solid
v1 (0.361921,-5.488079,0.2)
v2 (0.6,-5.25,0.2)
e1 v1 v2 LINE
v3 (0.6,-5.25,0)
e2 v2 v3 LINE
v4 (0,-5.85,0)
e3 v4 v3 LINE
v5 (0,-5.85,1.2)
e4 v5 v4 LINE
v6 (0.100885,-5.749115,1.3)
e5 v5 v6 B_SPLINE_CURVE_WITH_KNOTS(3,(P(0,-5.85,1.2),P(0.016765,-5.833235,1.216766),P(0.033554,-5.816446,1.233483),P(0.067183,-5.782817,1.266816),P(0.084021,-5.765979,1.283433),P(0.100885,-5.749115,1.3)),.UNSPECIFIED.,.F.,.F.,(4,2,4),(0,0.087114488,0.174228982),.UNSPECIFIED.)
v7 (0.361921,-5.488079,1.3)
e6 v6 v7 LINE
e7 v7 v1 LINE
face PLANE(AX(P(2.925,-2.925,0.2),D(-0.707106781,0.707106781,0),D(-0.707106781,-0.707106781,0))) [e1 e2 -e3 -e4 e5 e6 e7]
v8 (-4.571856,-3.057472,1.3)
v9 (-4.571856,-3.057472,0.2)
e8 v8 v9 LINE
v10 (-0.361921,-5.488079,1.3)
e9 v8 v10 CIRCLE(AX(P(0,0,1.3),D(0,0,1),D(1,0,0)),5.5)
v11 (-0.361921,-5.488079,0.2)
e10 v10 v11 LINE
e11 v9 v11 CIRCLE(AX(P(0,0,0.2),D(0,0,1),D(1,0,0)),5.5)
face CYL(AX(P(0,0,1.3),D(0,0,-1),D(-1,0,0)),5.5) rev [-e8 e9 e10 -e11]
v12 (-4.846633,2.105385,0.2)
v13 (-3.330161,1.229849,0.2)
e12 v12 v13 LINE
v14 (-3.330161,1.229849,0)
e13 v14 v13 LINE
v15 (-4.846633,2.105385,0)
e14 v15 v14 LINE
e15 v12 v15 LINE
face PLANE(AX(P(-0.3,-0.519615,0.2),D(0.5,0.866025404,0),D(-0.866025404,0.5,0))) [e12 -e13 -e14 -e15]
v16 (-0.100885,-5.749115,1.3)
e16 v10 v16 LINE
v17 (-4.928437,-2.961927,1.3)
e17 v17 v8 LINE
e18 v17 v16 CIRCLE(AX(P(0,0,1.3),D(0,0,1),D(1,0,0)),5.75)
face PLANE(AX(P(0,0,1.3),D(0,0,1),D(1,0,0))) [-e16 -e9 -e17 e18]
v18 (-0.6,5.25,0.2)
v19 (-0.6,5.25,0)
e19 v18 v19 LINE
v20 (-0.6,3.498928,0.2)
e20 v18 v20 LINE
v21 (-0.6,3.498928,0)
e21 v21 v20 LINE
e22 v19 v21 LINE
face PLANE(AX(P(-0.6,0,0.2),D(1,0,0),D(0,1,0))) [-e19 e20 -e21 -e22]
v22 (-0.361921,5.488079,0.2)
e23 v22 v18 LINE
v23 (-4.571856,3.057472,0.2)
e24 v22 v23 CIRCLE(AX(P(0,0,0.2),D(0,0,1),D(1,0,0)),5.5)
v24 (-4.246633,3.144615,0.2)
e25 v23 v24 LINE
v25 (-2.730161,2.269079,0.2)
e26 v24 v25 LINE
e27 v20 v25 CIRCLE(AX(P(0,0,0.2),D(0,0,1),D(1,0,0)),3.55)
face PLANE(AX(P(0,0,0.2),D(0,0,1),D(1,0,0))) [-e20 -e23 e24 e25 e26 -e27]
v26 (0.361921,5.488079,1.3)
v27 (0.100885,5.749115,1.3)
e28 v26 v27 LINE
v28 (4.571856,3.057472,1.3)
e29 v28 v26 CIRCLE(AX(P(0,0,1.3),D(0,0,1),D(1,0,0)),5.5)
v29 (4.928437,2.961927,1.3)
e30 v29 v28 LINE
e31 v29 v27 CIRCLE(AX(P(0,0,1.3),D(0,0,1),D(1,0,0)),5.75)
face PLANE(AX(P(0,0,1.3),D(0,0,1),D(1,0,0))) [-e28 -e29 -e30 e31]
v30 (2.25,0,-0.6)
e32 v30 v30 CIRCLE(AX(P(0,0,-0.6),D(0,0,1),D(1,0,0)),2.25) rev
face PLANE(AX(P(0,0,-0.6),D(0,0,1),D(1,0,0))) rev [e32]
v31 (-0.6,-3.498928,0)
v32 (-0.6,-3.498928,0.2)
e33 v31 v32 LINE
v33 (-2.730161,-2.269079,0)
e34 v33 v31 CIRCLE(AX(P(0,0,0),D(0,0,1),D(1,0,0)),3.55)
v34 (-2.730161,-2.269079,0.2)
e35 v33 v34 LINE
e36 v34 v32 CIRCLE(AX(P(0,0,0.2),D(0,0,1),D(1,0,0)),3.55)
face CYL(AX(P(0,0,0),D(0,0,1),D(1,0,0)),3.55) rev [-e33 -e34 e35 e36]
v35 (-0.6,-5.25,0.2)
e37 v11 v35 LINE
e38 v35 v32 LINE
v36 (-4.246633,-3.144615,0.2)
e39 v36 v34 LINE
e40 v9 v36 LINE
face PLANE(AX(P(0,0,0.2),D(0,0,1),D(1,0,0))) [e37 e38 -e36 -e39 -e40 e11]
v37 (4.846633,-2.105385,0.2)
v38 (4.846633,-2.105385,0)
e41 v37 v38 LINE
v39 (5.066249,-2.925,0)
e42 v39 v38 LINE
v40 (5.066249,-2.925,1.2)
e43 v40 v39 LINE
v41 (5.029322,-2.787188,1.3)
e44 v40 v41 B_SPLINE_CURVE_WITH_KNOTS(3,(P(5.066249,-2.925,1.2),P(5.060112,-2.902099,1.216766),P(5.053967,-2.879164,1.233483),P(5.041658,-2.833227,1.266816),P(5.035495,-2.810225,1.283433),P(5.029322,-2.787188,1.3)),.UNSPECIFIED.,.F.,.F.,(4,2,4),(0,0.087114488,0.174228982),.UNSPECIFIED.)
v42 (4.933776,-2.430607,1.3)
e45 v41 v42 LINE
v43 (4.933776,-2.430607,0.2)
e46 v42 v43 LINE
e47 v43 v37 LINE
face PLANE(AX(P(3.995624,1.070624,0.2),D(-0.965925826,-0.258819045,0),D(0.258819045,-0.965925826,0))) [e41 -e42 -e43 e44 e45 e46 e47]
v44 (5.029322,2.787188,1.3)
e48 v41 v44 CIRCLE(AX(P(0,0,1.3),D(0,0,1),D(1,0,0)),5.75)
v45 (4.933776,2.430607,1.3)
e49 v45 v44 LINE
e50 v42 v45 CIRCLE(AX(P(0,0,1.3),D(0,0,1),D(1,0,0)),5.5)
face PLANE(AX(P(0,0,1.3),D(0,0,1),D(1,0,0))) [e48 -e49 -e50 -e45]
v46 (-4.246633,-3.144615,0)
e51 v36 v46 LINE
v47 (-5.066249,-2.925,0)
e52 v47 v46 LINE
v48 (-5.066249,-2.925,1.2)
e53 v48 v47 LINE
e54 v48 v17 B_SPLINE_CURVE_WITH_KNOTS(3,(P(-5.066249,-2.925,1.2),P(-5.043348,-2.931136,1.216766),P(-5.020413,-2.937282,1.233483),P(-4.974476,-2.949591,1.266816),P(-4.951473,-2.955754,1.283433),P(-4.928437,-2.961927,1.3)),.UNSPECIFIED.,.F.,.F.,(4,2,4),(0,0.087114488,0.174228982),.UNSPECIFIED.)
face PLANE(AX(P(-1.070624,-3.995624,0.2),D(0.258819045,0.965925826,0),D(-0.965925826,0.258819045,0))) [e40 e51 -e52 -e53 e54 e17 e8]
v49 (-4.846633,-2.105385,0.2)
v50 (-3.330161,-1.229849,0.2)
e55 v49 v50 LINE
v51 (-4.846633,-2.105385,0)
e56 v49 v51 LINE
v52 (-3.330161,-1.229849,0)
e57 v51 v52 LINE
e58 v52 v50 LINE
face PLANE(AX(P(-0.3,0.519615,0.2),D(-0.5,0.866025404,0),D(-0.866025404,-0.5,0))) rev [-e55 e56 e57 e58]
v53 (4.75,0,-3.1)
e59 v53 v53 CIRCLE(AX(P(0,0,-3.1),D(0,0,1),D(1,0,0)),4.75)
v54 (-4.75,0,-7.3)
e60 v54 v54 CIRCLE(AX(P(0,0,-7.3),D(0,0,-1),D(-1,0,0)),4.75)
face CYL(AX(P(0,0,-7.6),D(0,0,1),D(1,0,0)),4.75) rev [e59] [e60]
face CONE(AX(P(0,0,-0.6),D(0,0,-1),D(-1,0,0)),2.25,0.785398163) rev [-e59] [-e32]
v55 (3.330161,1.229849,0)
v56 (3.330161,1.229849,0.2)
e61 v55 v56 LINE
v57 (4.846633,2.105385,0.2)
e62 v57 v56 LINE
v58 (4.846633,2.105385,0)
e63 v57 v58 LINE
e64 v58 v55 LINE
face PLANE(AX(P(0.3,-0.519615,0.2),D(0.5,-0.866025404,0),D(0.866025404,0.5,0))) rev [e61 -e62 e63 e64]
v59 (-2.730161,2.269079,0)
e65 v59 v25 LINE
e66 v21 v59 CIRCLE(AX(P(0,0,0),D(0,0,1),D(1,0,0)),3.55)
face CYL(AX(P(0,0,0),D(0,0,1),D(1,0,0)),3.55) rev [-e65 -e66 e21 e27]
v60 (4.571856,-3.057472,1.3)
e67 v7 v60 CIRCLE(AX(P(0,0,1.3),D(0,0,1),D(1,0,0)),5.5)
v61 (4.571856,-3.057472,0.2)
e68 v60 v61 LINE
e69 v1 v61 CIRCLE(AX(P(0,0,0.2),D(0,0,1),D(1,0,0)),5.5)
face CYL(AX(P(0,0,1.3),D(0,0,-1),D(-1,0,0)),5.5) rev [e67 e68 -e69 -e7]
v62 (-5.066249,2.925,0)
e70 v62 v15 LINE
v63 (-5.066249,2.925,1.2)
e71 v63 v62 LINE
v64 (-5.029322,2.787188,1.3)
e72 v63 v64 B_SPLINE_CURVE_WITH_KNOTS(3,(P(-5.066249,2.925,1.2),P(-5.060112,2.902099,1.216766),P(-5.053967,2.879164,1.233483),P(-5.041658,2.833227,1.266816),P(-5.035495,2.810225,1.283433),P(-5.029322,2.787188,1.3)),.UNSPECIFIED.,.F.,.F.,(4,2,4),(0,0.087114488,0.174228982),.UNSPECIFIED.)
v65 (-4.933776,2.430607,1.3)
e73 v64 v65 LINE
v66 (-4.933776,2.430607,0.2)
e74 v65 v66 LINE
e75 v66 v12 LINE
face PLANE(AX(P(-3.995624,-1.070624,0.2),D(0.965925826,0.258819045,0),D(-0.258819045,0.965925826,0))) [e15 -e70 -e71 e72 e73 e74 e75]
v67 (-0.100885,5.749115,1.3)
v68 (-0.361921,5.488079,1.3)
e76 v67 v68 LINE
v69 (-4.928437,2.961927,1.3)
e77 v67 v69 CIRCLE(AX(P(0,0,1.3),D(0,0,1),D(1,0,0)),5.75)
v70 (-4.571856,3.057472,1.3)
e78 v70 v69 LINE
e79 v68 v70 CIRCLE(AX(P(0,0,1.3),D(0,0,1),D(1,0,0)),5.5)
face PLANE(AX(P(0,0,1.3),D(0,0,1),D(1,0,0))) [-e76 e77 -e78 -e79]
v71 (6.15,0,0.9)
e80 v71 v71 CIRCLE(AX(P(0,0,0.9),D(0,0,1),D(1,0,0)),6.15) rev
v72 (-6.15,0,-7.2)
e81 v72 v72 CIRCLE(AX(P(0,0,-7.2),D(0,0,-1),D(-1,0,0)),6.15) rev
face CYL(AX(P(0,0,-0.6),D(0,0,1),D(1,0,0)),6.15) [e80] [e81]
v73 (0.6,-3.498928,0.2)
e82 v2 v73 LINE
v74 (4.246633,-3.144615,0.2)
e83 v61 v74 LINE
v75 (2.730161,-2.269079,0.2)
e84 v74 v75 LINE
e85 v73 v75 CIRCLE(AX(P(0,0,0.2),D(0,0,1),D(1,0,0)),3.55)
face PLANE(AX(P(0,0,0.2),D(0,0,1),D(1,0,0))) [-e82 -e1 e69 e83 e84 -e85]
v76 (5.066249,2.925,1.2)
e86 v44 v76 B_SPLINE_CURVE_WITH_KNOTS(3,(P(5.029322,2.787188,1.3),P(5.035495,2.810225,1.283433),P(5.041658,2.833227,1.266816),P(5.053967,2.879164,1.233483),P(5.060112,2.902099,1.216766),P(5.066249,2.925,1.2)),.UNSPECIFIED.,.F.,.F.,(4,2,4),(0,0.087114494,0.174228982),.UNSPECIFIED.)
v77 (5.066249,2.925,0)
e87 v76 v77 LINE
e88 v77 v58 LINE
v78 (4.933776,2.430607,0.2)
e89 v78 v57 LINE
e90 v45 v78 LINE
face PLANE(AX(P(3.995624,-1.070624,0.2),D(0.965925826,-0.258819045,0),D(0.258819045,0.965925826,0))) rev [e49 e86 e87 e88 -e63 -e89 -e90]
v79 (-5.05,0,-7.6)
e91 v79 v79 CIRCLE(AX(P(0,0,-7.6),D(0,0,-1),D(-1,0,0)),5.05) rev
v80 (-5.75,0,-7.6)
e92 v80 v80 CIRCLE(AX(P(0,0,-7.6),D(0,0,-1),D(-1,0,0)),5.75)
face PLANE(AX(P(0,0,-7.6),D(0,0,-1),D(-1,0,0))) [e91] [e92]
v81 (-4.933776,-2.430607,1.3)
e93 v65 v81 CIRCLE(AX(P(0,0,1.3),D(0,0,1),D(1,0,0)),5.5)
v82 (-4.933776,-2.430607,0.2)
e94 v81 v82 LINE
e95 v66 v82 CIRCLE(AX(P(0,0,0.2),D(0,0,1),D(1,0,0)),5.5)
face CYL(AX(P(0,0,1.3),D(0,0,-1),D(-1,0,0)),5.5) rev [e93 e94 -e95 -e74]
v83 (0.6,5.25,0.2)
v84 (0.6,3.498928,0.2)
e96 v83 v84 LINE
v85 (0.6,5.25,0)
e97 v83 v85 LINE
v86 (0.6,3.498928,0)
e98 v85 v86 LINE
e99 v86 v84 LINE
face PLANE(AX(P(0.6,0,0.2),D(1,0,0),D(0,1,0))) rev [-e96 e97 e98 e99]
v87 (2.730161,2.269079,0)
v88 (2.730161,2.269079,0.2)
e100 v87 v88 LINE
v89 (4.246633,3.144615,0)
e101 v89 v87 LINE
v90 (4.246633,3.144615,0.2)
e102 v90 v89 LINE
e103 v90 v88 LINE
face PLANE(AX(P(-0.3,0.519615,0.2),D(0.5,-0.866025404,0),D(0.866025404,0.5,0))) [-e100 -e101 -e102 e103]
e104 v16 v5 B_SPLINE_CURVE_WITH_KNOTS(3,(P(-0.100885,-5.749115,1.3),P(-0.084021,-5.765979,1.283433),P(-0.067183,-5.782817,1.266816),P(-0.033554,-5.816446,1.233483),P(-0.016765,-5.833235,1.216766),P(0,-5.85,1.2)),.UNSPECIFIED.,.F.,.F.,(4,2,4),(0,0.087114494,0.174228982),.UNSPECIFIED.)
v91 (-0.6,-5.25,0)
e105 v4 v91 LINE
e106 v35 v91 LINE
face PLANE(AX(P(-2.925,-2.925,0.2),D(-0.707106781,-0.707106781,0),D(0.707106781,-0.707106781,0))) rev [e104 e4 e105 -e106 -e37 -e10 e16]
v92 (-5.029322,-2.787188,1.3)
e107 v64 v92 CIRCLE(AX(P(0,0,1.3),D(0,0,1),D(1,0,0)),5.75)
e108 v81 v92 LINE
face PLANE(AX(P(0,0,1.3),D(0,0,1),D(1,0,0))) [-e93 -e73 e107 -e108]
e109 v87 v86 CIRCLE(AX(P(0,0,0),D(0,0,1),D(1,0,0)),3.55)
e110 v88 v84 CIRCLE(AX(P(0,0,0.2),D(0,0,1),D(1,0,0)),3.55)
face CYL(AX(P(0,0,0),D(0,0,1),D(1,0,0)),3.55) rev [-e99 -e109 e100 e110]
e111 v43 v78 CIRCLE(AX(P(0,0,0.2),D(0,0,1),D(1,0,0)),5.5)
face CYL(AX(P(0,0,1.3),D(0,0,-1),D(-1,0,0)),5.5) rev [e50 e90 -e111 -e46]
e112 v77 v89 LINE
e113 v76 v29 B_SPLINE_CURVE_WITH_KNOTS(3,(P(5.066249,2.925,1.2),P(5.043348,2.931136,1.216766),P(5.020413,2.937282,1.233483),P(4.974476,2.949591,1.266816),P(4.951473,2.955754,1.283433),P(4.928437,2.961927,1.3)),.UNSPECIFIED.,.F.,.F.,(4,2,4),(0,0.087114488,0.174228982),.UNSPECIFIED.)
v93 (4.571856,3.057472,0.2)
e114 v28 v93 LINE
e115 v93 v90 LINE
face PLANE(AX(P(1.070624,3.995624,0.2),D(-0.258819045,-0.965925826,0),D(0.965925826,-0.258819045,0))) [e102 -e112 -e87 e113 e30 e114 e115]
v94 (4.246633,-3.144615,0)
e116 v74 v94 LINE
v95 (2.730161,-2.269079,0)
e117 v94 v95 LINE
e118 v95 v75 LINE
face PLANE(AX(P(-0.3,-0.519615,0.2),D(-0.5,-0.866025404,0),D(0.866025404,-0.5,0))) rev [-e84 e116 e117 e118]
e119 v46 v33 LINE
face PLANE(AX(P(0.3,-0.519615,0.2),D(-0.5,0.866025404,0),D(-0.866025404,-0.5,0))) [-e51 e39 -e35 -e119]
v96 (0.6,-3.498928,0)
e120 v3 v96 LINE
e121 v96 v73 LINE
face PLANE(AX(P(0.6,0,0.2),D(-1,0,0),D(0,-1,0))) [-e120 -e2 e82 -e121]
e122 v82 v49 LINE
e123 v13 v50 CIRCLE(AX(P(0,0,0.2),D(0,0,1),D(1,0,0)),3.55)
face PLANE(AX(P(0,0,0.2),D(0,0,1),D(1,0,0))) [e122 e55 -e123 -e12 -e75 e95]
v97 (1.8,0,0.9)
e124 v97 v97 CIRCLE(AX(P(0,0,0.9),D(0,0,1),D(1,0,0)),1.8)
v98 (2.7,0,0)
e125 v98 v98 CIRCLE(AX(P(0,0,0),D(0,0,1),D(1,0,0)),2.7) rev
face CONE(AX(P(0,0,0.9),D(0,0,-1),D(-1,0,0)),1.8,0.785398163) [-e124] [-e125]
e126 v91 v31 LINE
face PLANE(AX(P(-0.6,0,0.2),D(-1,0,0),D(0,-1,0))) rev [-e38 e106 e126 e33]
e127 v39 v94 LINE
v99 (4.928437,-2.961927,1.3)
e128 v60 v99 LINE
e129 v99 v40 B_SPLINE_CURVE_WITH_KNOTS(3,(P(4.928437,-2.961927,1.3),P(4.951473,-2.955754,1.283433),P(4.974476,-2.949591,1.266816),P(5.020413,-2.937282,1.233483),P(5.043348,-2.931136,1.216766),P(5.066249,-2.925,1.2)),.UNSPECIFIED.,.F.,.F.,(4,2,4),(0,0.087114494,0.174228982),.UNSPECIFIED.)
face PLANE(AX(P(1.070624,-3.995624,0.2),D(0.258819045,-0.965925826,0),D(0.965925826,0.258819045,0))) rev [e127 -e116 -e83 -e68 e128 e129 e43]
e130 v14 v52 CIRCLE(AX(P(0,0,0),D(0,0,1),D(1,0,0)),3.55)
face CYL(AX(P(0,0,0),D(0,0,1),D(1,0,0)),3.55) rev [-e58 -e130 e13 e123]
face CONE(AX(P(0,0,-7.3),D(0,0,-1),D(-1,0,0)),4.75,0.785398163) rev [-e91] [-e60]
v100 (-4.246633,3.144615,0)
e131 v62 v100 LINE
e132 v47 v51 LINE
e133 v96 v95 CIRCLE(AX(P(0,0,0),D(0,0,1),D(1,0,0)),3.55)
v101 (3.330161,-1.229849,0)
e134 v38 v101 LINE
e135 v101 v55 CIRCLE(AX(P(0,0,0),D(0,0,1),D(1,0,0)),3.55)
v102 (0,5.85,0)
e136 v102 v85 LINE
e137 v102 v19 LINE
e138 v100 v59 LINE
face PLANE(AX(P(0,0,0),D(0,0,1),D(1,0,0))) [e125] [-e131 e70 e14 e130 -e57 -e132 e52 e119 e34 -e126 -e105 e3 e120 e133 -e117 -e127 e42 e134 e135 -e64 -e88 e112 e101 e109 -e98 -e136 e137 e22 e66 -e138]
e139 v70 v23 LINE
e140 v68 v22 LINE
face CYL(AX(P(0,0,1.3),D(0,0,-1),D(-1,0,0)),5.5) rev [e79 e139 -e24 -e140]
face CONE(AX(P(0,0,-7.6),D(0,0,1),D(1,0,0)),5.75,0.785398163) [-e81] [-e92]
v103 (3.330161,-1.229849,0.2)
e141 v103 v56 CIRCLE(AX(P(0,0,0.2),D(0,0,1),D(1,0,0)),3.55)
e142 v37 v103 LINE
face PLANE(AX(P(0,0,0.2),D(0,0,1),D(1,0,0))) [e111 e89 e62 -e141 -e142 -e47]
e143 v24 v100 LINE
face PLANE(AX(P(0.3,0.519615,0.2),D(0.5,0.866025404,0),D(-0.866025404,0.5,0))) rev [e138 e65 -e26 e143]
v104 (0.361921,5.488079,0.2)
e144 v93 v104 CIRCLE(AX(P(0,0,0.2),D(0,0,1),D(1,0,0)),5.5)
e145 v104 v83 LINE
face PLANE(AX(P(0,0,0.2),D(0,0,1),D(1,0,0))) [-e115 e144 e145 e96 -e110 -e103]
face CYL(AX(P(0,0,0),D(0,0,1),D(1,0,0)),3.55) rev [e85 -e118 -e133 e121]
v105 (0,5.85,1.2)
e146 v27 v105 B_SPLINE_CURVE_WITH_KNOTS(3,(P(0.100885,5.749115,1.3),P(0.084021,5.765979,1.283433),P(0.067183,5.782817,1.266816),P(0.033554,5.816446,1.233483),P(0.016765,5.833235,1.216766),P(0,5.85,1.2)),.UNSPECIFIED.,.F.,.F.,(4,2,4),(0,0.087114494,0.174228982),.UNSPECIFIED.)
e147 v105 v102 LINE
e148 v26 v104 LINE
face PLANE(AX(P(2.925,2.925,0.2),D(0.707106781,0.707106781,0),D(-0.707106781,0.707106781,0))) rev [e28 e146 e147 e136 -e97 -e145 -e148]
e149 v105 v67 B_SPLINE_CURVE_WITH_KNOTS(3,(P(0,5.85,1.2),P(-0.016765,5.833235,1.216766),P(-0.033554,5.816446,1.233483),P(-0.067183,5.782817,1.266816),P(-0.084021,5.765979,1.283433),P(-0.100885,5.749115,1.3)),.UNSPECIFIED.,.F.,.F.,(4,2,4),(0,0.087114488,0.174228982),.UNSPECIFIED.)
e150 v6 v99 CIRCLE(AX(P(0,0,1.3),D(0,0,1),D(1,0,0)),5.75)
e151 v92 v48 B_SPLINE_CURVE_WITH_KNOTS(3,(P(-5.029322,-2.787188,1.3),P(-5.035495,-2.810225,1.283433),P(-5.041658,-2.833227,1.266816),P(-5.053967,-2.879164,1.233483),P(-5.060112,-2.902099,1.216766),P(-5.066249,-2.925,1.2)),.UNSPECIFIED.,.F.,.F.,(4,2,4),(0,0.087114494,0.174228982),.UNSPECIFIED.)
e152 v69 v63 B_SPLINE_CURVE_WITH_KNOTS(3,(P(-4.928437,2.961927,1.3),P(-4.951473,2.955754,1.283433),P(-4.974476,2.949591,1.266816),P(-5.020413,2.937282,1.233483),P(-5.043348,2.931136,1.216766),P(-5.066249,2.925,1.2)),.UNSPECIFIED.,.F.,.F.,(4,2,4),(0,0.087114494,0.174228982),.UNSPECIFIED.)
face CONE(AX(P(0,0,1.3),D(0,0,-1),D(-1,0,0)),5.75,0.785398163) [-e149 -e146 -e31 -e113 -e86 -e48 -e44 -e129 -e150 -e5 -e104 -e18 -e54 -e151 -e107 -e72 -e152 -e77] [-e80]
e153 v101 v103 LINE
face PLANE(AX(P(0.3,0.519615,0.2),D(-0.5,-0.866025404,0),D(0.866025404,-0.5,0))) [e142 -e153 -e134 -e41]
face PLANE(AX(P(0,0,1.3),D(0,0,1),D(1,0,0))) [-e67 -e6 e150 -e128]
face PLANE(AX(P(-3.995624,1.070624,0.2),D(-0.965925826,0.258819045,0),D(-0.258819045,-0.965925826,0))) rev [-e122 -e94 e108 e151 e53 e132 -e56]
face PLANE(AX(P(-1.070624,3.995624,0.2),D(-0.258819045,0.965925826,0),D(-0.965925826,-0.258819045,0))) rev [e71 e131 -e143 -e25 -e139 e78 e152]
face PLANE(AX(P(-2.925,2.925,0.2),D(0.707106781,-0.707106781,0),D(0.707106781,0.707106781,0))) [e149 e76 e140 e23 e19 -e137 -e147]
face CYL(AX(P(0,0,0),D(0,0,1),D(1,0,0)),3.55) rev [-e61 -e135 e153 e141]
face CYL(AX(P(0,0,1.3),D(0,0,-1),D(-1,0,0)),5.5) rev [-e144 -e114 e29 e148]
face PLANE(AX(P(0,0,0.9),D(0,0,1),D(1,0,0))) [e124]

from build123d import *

# Parameters (mm, degrees)
SKETCH_1_R          = 6.15
EXTRUDE_1_DEPTH     = 0.2
SKETCH_2_R          = 2.8
EXTRUDE_2_DEPTH     = 0.9
SKETCH_3_R          = 6.15
EXTRUDE_3_DEPTH     = 1.1
EXTRUDE_START       = -0.6
SKETCH_4_R          = 6.15
EXTRUDE_4_DEPTH     = 0.6
CUT_EXTRUDE_START   = -0.2
SKETCH_6_R          = 3.55
SKETCH_6_R_2        = 2.8
CUT_EXTRUDE_2_DEPTH = 0.2
EXTRUDE_START_2     = 7
SKETCH_7_R          = 6.15
SKETCH_7_R_2        = 4.75
EXTRUDE_5_DEPTH     = 7
CHAMFER_4_SIZE      = 2.5
CHAMFER_5_SIZE      = 0.4
CHAMFER_6_SIZE      = 0.4
CHAMFER_7_SIZE      = 1
CHAMFER_8_SIZE      = 0.3


with BuildPart() as part:
    # 스케치1 → 보스-돌출1 (new body)
    with BuildSketch(Plane.XY):
        Circle(SKETCH_1_R)
        with BuildLine():
            Line((-0.6, 5.25), (0, 5.85))
            Line((0, 5.85), (0.6, 5.25))
            Line((0.6, 5.25), (0.6, 1.670516387))
            ThreePointArc((0.6, 1.670516387), (0.8875, 1.537195092), (1.146709629, 1.354873436))
            Line((1.146709629, 1.354873436), (4.24663337, 3.144615242))
            Line((4.24663337, 3.144615242), (5.066248612, 2.925))
            Line((5.066248612, 2.925), (4.84663337, 2.105384758))
            Line((4.84663337, 2.105384758), (1.746709629, 0.315642951))
            ThreePointArc((1.746709629, 0.315642951), (1.76791326, 0.158454108), (1.775, 0))
            ThreePointArc((1.775, 0), (1.76791326, -0.158454108), (1.746709629, -0.315642951))
            Line((1.746709629, -0.315642951), (4.84663337, -2.105384758))
            Line((4.84663337, -2.105384758), (5.066248612, -2.925))
            Line((5.066248612, -2.925), (4.24663337, -3.144615242))
            Line((4.24663337, -3.144615242), (1.146709629, -1.354873436))
            ThreePointArc((1.146709629, -1.354873436), (0.8875, -1.537195092), (0.6, -1.670516387))
            Line((0.6, -1.670516387), (0.6, -5.25))
            Line((0.6, -5.25), (0, -5.85))
            Line((0, -5.85), (-0.6, -5.25))
            Line((-0.6, -5.25), (-0.6, -1.670516387))
            ThreePointArc((-0.6, -1.670516387), (-0.8875, -1.537195092), (-1.146709629, -1.354873436))
            Line((-1.146709629, -1.354873436), (-4.24663337, -3.144615242))
            Line((-4.24663337, -3.144615242), (-5.066248612, -2.925))
            Line((-5.066248612, -2.925), (-4.84663337, -2.105384758))
            Line((-4.84663337, -2.105384758), (-1.746709629, -0.315642951))
            ThreePointArc((-1.746709629, -0.315642951), (-1.775, 0), (-1.746709629, 0.315642951))
            Line((-1.746709629, 0.315642951), (-4.84663337, 2.105384758))
            Line((-4.84663337, 2.105384758), (-5.066248612, 2.925))
            Line((-5.066248612, 2.925), (-4.24663337, 3.144615242))
            Line((-4.24663337, 3.144615242), (-1.146709629, 1.354873436))
            ThreePointArc((-1.146709629, 1.354873436), (-0.8875, 1.537195092), (-0.6, 1.670516387))
            Line((-0.6, 1.670516387), (-0.6, 5.25))
        make_face(mode=Mode.SUBTRACT)
    extrude(amount=EXTRUDE_1_DEPTH)

    # 스케치3 → 보스-돌출3 (add)
    with BuildSketch(Plane.XY.offset(0.2)):
        Circle(SKETCH_3_R)
        with BuildLine():
            Line((-4.933776406, -2.430606997), (-5.066248612, -2.925))
            Line((-5.066248612, -2.925), (-4.571855609, -3.057472206))
            ThreePointArc((-4.571855609, -3.057472206), (-2.75, -4.763139721), (-0.361920797, -5.488079203))
            Line((-0.361920797, -5.488079203), (0, -5.85))
            Line((0, -5.85), (0.361920797, -5.488079203))
            ThreePointArc((0.361920797, -5.488079203), (2.75, -4.763139721), (4.571855609, -3.057472206))
            Line((4.571855609, -3.057472206), (5.066248612, -2.925))
            Line((5.066248612, -2.925), (4.933776406, -2.430606997))
            ThreePointArc((4.933776406, -2.430606997), (5.5, 0), (4.933776406, 2.430606997))
            Line((4.933776406, 2.430606997), (5.066248612, 2.925))
            Line((5.066248612, 2.925), (4.571855609, 3.057472206))
            ThreePointArc((4.571855609, 3.057472206), (2.75, 4.763139721), (0.361920797, 5.488079203))
            Line((0.361920797, 5.488079203), (0, 5.85))
            Line((0, 5.85), (-0.361920797, 5.488079203))
            ThreePointArc((-0.361920797, 5.488079203), (-2.75, 4.763139721), (-4.571855609, 3.057472206))
            Line((-4.571855609, 3.057472206), (-5.066248612, 2.925))
            Line((-5.066248612, 2.925), (-4.933776406, 2.430606997))
            ThreePointArc((-4.933776406, 2.430606997), (-5.5, 0), (-4.933776406, -2.430606997))
        make_face(mode=Mode.SUBTRACT)
    extrude(amount=EXTRUDE_3_DEPTH)



with BuildPart() as body_2:
    # 스케치2 → 보스-돌출2 (new body)
    with BuildSketch(Plane.XY):
        Circle(SKETCH_2_R)
    extrude(amount=EXTRUDE_2_DEPTH)


with BuildPart() as part_1:
    add(part.part)

    add(body_2.part)  # 보스-돌출4 merges body 2
    # 스케치4 → 보스-돌출4 (add)
    with BuildSketch(Plane.XY.offset(EXTRUDE_START)):
        Circle(SKETCH_4_R)
    extrude(amount=EXTRUDE_4_DEPTH)

    # 스케치6 → 컷-돌출2 (cut)
    with BuildSketch(Plane.XY.offset(0.2).offset(CUT_EXTRUDE_START)):
        Circle(SKETCH_6_R)
        Circle(SKETCH_6_R_2, mode=Mode.SUBTRACT)
    extrude(amount=CUT_EXTRUDE_2_DEPTH, mode=Mode.SUBTRACT)

    # 스케치7 → 보스-돌출5 (add)
    with BuildSketch(Plane(origin=(0, 0, -0.6), x_dir=(-1, 0, 0), z_dir=(0, 0, -1)).offset(EXTRUDE_START_2)):
        with Locations(Location((0, 0, 0), (0, 0, 180))):
            Circle(SKETCH_7_R)
        Circle(SKETCH_7_R_2, mode=Mode.SUBTRACT)
    extrude(amount=-EXTRUDE_5_DEPTH)

    # 모따기4
    chamfer_4_edges = [part_1.edges().sort_by_distance(p)[0] for p in [
        (4.75, 0, -0.6),
    ]]
    chamfer(chamfer_4_edges, length=CHAMFER_4_SIZE)

    # 모따기5
    # the kernel refuses this chamfer: 0.4 mm, written as the material it takes off along each edge
    with BuildSketch(Plane(origin=(0, 0, 1.3), x_dir=(1, 0, 0), z_dir=(0, -1, 0))) as chamfer_5_piece_1:
        Polygon((6.15, -CHAMFER_5_SIZE), (6.15 - CHAMFER_5_SIZE, 0), (6.15, 0), align=None)
    revolve(axis=Axis((0, 0, 1.3), (0, 0, 1)), mode=Mode.SUBTRACT)

    # 모따기6
    chamfer_6_edges = [part_1.edges().sort_by_distance(p)[0] for p in [
        (-6.15, 0, -7.6),
    ]]
    chamfer(chamfer_6_edges, length=CHAMFER_6_SIZE)

    # 모따기7
    # the kernel refuses this chamfer: 1 mm, written as the material it takes off along each edge
    with BuildSketch(Plane(origin=(0, 0, 0.9), x_dir=(1, 0, 0), z_dir=(0, -1, 0))) as chamfer_7_piece_1_section:
        Polygon((2.8, -CHAMFER_7_SIZE), (2.8 - CHAMFER_7_SIZE, 0), (2.8, 0), align=None)
    chamfer_7_piece_1 = revolve(axis=Axis((0, 0, 0.9), (0, 0, 1)), mode=Mode.PRIVATE)
    chamfer_7_piece_1 = split(chamfer_7_piece_1, bisect_by=Plane(origin=(-2.250209939, 0, 0), z_dir=(0, 0, 1)), keep=Keep.TOP, mode=Mode.PRIVATE)
    add(chamfer_7_piece_1, mode=Mode.SUBTRACT)

    # 모따기8
    chamfer_8_edges = [part_1.edges().sort_by_distance(p)[0] for p in [
        (4.75, 0, -7.6),
    ]]
    chamfer(chamfer_8_edges, length=CHAMFER_8_SIZE)


solid = part_1.part
